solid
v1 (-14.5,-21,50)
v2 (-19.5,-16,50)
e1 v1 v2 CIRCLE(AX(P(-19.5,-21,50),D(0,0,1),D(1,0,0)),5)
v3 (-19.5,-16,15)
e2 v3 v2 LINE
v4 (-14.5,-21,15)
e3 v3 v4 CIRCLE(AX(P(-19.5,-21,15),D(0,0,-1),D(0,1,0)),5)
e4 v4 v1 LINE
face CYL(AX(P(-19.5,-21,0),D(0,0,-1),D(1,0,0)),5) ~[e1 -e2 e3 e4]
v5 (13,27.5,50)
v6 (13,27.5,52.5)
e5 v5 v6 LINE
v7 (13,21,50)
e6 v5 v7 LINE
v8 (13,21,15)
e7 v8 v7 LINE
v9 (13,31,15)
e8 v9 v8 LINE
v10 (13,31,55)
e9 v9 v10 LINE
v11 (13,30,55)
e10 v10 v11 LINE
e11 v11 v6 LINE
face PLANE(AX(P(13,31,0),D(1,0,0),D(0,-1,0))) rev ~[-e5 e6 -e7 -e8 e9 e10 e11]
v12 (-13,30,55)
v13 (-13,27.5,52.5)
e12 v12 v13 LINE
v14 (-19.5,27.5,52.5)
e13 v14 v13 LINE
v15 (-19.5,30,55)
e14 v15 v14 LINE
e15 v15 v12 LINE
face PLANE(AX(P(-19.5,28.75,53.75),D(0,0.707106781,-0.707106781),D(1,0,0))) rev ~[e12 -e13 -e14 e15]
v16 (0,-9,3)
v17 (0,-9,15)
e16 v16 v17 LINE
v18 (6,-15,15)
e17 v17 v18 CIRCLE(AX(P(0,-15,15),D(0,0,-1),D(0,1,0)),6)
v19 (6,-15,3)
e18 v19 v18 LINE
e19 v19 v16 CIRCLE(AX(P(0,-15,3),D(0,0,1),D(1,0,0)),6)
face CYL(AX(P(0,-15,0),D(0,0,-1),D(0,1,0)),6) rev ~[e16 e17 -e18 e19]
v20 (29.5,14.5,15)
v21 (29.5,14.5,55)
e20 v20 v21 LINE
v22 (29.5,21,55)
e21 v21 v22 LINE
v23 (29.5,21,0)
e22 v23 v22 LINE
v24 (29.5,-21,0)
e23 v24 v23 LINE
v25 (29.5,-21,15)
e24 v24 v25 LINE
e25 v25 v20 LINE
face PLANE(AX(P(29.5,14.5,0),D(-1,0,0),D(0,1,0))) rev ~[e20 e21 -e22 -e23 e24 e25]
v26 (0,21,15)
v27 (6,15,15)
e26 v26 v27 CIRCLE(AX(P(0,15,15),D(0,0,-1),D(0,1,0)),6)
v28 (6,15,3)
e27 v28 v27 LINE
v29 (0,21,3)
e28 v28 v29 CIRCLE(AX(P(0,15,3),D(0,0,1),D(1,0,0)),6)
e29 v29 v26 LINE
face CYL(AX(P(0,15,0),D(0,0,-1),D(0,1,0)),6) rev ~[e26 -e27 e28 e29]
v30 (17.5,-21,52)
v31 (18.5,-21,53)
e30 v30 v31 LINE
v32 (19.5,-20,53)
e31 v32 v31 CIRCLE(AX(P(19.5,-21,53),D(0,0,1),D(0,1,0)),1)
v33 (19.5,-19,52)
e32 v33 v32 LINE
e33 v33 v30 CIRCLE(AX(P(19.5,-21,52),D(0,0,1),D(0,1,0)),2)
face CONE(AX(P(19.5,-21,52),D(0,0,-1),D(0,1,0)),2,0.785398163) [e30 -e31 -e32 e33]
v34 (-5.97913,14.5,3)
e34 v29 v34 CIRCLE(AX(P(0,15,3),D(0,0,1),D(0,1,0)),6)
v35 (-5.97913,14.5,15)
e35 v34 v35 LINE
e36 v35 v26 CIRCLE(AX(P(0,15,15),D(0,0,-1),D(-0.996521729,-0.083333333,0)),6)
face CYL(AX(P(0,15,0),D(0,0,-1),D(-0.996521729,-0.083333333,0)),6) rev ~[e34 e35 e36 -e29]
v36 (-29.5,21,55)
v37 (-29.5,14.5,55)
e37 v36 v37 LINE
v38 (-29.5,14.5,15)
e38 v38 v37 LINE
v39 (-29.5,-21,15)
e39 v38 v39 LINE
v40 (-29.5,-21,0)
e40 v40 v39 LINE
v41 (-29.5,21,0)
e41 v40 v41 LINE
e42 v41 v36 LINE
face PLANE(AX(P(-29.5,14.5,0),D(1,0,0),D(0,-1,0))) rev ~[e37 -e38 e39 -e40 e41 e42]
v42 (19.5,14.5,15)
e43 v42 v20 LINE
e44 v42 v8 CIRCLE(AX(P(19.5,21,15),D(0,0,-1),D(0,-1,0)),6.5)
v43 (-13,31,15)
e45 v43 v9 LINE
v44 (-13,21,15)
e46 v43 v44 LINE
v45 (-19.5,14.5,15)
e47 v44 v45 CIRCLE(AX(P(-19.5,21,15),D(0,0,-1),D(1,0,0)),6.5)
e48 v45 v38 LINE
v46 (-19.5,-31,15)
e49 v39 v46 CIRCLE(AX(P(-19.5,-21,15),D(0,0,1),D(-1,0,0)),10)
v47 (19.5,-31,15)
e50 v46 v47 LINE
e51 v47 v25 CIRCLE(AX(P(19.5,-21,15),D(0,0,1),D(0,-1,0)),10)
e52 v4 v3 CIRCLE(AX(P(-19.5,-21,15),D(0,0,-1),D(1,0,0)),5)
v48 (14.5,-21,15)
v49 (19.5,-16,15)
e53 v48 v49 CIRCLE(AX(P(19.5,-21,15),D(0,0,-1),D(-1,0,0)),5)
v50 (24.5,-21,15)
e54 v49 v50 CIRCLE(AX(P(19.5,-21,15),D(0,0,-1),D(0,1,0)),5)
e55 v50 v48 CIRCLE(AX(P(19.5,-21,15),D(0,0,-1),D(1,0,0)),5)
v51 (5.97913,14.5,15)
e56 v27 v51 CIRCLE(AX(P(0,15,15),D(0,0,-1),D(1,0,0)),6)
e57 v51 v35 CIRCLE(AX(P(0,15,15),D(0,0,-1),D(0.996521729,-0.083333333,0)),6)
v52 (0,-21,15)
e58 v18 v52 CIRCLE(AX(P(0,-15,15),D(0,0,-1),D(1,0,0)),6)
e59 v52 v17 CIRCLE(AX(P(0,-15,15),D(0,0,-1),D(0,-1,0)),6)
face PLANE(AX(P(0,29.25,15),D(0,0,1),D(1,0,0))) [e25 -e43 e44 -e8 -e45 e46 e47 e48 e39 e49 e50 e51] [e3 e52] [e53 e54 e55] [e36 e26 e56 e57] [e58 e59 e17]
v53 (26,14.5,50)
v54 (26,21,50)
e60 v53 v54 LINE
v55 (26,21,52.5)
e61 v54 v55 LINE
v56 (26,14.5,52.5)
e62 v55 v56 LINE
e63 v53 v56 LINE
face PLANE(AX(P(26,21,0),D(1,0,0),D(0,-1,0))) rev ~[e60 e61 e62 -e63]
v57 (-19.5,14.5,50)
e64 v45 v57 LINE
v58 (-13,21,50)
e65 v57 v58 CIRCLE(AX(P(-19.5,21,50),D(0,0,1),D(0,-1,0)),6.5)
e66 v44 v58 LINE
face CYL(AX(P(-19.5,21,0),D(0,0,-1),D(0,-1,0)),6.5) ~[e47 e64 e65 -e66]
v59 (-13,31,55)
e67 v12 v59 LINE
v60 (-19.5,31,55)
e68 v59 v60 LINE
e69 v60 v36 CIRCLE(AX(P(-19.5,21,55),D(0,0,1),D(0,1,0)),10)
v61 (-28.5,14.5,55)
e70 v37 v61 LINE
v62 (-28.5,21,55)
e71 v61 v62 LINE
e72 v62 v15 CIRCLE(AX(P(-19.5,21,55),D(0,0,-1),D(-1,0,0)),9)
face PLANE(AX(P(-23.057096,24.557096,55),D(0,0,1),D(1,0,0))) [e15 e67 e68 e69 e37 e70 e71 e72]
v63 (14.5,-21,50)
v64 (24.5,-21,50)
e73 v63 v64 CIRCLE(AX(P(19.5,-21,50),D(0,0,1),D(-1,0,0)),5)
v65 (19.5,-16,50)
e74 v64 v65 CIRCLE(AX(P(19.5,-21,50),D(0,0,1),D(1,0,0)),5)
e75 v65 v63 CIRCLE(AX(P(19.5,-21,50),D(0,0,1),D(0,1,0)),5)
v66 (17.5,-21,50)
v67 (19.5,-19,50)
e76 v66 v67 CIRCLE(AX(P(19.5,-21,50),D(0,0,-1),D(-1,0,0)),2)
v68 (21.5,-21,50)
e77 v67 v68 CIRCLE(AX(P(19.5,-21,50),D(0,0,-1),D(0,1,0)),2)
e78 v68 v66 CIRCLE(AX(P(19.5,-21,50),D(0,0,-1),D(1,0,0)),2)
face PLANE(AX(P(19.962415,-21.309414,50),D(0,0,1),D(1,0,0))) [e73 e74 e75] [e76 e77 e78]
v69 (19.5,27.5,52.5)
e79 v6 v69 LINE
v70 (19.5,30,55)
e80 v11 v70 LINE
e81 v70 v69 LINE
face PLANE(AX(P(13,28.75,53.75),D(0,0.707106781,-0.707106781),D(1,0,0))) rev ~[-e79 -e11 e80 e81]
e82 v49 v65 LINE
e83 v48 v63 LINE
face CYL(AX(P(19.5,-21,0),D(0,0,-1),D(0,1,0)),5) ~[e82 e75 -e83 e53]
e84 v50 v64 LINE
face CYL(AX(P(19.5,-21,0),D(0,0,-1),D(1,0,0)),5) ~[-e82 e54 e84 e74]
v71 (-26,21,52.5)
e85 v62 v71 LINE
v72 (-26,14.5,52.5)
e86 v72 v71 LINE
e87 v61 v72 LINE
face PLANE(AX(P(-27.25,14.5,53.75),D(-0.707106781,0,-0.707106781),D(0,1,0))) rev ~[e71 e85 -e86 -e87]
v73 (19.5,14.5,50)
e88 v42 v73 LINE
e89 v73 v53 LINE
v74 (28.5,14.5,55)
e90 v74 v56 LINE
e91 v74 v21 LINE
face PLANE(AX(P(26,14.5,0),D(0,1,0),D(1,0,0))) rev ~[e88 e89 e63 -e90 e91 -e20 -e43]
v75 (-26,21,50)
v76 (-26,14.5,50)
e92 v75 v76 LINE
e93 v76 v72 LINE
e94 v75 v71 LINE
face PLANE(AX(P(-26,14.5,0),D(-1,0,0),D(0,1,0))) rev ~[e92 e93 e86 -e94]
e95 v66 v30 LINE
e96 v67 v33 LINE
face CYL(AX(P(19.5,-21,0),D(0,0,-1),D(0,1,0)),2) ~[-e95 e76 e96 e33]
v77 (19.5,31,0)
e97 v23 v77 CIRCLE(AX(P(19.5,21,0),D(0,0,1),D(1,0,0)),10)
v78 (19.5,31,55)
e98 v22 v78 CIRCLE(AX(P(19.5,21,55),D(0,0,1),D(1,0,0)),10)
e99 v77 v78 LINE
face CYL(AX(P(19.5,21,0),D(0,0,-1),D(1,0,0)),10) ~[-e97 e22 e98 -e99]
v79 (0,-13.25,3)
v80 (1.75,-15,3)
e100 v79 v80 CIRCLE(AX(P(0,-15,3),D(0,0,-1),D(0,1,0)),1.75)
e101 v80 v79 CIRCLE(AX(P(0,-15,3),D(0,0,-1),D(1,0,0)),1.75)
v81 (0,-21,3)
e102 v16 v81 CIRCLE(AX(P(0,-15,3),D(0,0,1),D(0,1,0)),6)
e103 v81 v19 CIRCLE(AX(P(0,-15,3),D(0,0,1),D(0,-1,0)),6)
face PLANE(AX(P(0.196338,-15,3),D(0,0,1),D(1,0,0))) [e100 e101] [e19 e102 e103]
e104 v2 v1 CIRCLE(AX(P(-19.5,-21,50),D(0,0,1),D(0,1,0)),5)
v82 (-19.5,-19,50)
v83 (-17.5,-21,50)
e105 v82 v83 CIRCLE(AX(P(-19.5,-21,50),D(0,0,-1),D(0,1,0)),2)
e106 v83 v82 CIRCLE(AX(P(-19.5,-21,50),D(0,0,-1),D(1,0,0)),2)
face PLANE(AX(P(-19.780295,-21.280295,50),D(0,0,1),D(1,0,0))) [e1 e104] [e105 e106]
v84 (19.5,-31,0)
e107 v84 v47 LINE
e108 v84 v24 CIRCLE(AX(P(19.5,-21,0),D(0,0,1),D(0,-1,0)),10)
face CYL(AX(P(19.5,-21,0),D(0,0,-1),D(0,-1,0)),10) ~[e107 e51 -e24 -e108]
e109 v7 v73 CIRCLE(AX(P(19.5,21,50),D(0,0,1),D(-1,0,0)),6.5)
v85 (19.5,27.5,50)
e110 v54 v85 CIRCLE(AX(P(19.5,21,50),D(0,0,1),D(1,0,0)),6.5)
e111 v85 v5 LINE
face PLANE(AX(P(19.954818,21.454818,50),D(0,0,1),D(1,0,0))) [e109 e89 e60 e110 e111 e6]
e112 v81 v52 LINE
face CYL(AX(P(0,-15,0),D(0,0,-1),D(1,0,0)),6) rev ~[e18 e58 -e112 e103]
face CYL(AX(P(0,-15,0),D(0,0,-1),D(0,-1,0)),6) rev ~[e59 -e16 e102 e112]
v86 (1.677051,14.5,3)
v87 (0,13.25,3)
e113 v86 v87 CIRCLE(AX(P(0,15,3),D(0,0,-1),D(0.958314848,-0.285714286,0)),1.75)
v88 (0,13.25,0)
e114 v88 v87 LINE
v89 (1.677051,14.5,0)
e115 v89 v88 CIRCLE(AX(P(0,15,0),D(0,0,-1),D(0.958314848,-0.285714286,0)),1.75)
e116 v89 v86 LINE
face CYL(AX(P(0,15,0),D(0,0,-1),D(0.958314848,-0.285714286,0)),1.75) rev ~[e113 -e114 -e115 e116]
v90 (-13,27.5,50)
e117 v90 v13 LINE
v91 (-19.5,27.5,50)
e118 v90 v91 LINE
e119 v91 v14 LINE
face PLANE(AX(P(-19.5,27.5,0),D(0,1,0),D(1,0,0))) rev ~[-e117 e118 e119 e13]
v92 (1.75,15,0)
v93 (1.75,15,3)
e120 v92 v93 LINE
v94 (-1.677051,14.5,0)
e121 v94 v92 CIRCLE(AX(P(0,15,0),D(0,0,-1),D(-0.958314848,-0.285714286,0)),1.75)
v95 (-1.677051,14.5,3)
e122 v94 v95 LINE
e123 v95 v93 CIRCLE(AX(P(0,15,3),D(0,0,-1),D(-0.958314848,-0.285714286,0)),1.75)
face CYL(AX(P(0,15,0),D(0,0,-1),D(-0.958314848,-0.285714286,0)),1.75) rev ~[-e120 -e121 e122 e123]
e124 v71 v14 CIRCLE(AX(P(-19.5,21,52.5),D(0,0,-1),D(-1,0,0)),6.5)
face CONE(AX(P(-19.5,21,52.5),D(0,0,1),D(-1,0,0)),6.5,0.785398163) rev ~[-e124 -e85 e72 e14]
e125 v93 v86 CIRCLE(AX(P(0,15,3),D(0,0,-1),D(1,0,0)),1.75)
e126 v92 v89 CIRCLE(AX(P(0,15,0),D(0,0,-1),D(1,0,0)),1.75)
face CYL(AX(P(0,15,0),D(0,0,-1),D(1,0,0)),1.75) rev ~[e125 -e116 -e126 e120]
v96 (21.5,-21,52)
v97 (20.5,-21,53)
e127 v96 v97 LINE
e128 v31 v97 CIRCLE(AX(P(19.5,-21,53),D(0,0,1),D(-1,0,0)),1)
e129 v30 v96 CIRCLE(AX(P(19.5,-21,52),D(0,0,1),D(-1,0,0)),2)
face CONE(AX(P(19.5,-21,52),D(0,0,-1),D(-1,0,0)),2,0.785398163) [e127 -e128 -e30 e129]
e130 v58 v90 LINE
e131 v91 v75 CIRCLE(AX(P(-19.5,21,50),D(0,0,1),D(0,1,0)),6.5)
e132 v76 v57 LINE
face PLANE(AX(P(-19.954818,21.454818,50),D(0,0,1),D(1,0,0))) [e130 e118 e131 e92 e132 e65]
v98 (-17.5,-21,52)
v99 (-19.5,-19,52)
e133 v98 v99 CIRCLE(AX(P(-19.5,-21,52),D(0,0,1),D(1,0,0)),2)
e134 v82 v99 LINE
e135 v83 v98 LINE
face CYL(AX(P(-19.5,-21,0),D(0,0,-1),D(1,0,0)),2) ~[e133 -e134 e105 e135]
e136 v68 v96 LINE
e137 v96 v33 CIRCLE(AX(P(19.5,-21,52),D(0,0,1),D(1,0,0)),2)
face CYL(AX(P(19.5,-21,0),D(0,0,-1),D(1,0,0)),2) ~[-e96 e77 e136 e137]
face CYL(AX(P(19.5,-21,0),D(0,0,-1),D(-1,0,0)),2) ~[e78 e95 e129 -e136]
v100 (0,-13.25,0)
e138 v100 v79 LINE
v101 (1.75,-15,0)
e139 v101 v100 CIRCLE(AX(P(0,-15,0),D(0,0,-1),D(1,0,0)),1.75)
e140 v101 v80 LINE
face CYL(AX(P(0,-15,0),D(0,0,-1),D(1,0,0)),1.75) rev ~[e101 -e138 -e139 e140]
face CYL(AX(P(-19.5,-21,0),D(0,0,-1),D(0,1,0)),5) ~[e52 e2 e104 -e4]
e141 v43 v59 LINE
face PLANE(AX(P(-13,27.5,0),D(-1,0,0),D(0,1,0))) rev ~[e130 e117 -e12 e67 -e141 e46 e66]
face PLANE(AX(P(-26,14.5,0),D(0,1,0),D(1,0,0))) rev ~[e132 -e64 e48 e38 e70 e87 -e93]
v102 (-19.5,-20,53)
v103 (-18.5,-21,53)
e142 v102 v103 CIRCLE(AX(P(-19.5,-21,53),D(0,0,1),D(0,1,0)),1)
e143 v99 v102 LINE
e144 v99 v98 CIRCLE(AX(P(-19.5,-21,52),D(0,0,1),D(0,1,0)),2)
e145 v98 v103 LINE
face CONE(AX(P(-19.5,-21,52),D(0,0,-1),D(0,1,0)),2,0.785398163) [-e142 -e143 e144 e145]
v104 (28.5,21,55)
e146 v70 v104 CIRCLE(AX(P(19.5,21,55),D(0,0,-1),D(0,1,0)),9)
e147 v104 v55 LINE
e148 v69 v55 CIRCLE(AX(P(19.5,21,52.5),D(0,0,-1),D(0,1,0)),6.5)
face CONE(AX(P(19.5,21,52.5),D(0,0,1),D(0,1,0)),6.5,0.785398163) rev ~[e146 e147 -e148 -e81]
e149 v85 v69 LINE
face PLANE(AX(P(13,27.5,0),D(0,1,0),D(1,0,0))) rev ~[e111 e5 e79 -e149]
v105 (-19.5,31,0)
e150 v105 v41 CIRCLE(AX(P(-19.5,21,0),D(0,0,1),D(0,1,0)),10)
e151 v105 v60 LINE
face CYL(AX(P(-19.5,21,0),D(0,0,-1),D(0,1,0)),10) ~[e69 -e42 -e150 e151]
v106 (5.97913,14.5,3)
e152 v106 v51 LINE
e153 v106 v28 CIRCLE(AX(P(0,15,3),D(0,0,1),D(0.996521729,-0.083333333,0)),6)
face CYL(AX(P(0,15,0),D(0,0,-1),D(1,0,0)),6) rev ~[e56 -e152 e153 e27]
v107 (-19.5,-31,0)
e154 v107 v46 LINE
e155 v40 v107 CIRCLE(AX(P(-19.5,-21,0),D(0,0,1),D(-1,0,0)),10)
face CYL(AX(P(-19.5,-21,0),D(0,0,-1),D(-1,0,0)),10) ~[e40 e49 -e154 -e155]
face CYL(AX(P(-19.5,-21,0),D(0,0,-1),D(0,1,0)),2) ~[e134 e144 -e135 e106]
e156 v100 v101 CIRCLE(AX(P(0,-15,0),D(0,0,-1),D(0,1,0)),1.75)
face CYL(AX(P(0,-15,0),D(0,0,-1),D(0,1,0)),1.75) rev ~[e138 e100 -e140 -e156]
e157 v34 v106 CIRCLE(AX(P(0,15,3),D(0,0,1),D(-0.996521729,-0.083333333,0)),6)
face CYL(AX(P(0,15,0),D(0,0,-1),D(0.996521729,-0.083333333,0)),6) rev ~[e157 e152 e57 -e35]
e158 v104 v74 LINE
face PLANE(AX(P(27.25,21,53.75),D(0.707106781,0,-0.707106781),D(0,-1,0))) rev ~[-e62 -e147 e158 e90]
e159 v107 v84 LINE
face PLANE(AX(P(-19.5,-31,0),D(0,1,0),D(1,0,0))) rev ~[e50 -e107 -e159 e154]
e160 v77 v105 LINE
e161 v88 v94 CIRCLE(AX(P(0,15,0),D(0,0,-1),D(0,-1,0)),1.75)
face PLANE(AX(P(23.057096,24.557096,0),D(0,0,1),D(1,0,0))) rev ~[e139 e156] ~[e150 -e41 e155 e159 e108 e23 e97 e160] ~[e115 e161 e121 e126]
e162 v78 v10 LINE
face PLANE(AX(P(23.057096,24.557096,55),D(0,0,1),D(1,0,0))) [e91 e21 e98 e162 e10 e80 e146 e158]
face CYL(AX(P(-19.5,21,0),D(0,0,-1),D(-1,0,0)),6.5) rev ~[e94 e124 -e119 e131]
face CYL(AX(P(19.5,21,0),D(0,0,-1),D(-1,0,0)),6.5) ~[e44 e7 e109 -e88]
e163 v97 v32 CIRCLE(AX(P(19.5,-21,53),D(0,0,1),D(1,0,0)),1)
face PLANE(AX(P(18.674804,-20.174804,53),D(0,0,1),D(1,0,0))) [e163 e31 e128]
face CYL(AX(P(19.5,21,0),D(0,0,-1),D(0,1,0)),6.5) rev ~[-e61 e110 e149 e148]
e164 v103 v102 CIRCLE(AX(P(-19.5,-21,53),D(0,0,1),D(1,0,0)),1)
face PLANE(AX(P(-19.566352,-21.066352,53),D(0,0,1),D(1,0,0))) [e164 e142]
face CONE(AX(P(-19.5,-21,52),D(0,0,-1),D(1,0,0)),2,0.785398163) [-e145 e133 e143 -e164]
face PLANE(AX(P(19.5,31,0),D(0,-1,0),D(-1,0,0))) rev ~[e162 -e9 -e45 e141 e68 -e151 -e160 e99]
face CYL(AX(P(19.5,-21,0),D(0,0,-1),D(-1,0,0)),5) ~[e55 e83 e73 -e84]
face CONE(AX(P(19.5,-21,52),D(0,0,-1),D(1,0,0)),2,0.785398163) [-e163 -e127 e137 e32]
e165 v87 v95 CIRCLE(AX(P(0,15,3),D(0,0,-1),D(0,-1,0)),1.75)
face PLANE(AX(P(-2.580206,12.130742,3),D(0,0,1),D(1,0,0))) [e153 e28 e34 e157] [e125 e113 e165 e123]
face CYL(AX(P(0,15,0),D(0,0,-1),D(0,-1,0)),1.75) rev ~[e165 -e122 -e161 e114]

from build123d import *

# Parameters (mm, degrees)
F0_W     = 26
F0_H     = 3.5
F1_DEPTH = 15
F2_DEPTH = 50
F3_DEPTH = 53
F4_DEPTH = 3
F5_DEPTH = 55
F6_SIZE  = 2.5
F7_SIZE  = 1


# Not quite as in the source:
# - a feature names something its author has since deleted; it is built from what else it names


with BuildPart() as f1:
    # F0 (on Top) → F1 (new body)
    with BuildSketch(Plane.XY):
        with Locations((0, 29.25)):
            Rectangle(F0_W, F0_H)
        with BuildLine():
            Line((29.5, -21), (29.5, 14.5))
            Line((29.5, 14.5), (26, 14.5))
            Line((26, 14.5), (19.5, 14.5))
            Line((19.5, 14.5), (19.5, 0))
            Line((19.5, 0), (19.5, -16))
            ThreePointArc((19.5, -16), (23.0355339059, -17.4644660941), (24.5, -21))
            ThreePointArc((24.5, -21), (19.5, -26), (14.5, -21))
            Line((14.5, -21), (0, -21))
            Line((0, -21), (-14.5, -21))
            ThreePointArc((-14.5, -21), (-23.0355339059, -24.5355339059), (-19.5, -16))
            Line((-19.5, -16), (-19.5, 14.5))
            Line((-19.5, 14.5), (-26, 14.5))
            Line((-26, 14.5), (-29.5, 14.5))
            Line((-29.5, 14.5), (-29.5, -21))
            ThreePointArc((-29.5, -21), (-26.5710678119, -28.0710678119), (-19.5, -31))
            Line((-19.5, -31), (19.5, -31))
            ThreePointArc((19.5, -31), (26.5710678119, -28.0710678119), (29.5, -21))
        make_face()
        with BuildLine():
            Line((19.5, 0), (19.5, 14.5))
            Line((19.5, 14.5), (5.9791303716, 14.5))
            ThreePointArc((5.9791303716, 14.5), (4.0620192023, 10.5841195668), (0, 9))
            Line((0, 9), (0, 0))
            Line((0, 0), (19.5, 0))
        make_face()
        with BuildLine():
            Line((-5.9791303716, 14.5), (-19.5, 14.5))
            Line((-19.5, 14.5), (-19.5, -16))
            ThreePointArc((-19.5, -16), (-15.9644660941, -17.4644660941), (-14.5, -21))
            Line((-14.5, -21), (0, -21))
            ThreePointArc((0, -21), (-6, -15), (0, -9))
            Line((0, -9), (0, 0))
            Line((0, 0), (0, 9))
            ThreePointArc((0, 9), (-4.0620192023, 10.5841195668), (-5.9791303716, 14.5))
        make_face()
        with BuildLine():
            Line((19.5, -16), (19.5, 0))
            Line((19.5, 0), (0, 0))
            Line((0, 0), (0, -9))
            ThreePointArc((0, -9), (4.2426406871, -10.7573593129), (6, -15))
            ThreePointArc((6, -15), (4.2426406871, -19.2426406871), (0, -21))
            Line((0, -21), (14.5, -21))
            ThreePointArc((14.5, -21), (15.9644660941, -17.4644660941), (19.5, -16))
        make_face()
        Polygon((13, 21), (13, 27.5), (-13, 27.5), (-13, 21), (0, 21), align=None)
        with BuildLine():
            Line((0, 21), (-13, 21))
            ThreePointArc((-13, 21), (-14.9038059223, 16.4038059223), (-19.5, 14.5))
            Line((-19.5, 14.5), (-5.9791303716, 14.5))
            ThreePointArc((-5.9791303716, 14.5), (-4.4158804332, 19.0620192023), (0, 21))
        make_face()
        with BuildLine():
            ThreePointArc((19.5, 14.5), (14.9038059223, 16.4038059223), (13, 21))
            Line((13, 21), (0, 21))
            ThreePointArc((0, 21), (4.2426406871, 19.2426406871), (6, 15))
            ThreePointArc((6, 15), (5.9947803225, 14.7497823241), (5.9791303716, 14.5))
            Line((5.9791303716, 14.5), (19.5, 14.5))
        make_face()
    extrude(amount=F1_DEPTH)

    # F0 (on Top) → F2 (join)
    with BuildSketch(Plane.XY):
        with BuildLine():
            ThreePointArc((-13, 21), (-14.9038059223, 25.5961940777), (-19.5, 27.5))
            ThreePointArc((-19.5, 27.5), (-24.0961940777, 25.5961940777), (-26, 21))
            ThreePointArc((-26, 21), (-24.0961940777, 16.4038059223), (-19.5, 14.5))
            Line((-19.5, 14.5), (-19.5, 21))
            Line((-19.5, 21), (-13, 21))
        make_face()
        with BuildLine():
            ThreePointArc((-19.5, 14.5), (-14.9038059223, 16.4038059223), (-13, 21))
            Line((-13, 21), (-19.5, 21))
            Line((-19.5, 21), (-19.5, 14.5))
        make_face()
        with BuildLine():
            Line((-13, 21), (-13, 27.5))
            Line((-13, 27.5), (-19.5, 27.5))
            ThreePointArc((-19.5, 27.5), (-14.9038059223, 25.5961940777), (-13, 21))
        make_face()
        with BuildLine():
            ThreePointArc((26, 21), (24.0961940777, 25.5961940777), (19.5, 27.5))
            ThreePointArc((19.5, 27.5), (14.9038059223, 25.5961940777), (13, 21))
            Line((13, 21), (19.5, 21))
            Line((19.5, 21), (19.5, 14.5))
            ThreePointArc((19.5, 14.5), (24.0961940777, 16.4038059223), (26, 21))
        make_face()
        with BuildLine():
            Line((19.5, 21), (13, 21))
            ThreePointArc((13, 21), (14.9038059223, 16.4038059223), (19.5, 14.5))
            Line((19.5, 14.5), (19.5, 21))
        make_face()
        with BuildLine():
            ThreePointArc((24.5, -21), (23.0355339059, -17.4644660941), (19.5, -16))
            Line((19.5, -16), (19.5, -19))
            ThreePointArc((19.5, -19), (20.9142135624, -19.5857864376), (21.5, -21))
            ThreePointArc((21.5, -21), (19.5, -23), (17.5, -21))
            Line((17.5, -21), (14.5, -21))
            ThreePointArc((14.5, -21), (19.5, -26), (24.5, -21))
        make_face()
        with BuildLine():
            Line((19.5, -19), (19.5, -16))
            ThreePointArc((19.5, -16), (15.9644660941, -17.4644660941), (14.5, -21))
            Line((14.5, -21), (17.5, -21))
            ThreePointArc((17.5, -21), (18.0857864376, -19.5857864376), (19.5, -19))
        make_face()
        with BuildLine():
            Line((-19.5, -19), (-19.5, -16))
            ThreePointArc((-19.5, -16), (-23.0355339059, -24.5355339059), (-14.5, -21))
            Line((-14.5, -21), (-17.5, -21))
            ThreePointArc((-17.5, -21), (-20.9142135624, -22.4142135624), (-19.5, -19))
        make_face()
        with BuildLine():
            ThreePointArc((-14.5, -21), (-15.9644660941, -17.4644660941), (-19.5, -16))
            Line((-19.5, -16), (-19.5, -19))
            ThreePointArc((-19.5, -19), (-18.0857864376, -19.5857864376), (-17.5, -21))
            Line((-17.5, -21), (-14.5, -21))
        make_face()
        with BuildLine():
            Line((19.5, 27.5), (13, 27.5))
            Line((13, 27.5), (13, 21))
            ThreePointArc((13, 21), (14.9038059223, 25.5961940777), (19.5, 27.5))
        make_face()
        with BuildLine():
            Line((19.5, 14.5), (26, 14.5))
            Line((26, 14.5), (26, 21))
            ThreePointArc((26, 21), (24.0961940777, 16.4038059223), (19.5, 14.5))
        make_face()
        with BuildLine():
            ThreePointArc((-19.5, 14.5), (-24.0961940777, 16.4038059223), (-26, 21))
            Line((-26, 21), (-26, 14.5))
            Line((-26, 14.5), (-19.5, 14.5))
        make_face()
    extrude(amount=F2_DEPTH)

    # F0 (on Top) → F3 (join)
    with BuildSketch(Plane.XY):
        with BuildLine():
            Line((-19.5, -21), (-19.5, -19))
            ThreePointArc((-19.5, -19), (-20.9142135624, -22.4142135624), (-17.5, -21))
            Line((-17.5, -21), (-19.5, -21))
        make_face()
        with BuildLine():
            ThreePointArc((-17.5, -21), (-18.0857864376, -19.5857864376), (-19.5, -19))
            Line((-19.5, -19), (-19.5, -21))
            Line((-19.5, -21), (-17.5, -21))
        make_face()
        with BuildLine():
            Line((19.5, -21), (19.5, -19))
            ThreePointArc((19.5, -19), (18.0857864376, -19.5857864376), (17.5, -21))
            Line((17.5, -21), (19.5, -21))
        make_face()
        with BuildLine():
            ThreePointArc((21.5, -21), (20.9142135624, -19.5857864376), (19.5, -19))
            Line((19.5, -19), (19.5, -21))
            Line((19.5, -21), (17.5, -21))
            ThreePointArc((17.5, -21), (19.5, -23), (21.5, -21))
        make_face()
    extrude(amount=F3_DEPTH)

    # F0 (on Top) → F4 (join)
    with BuildSketch(Plane.XY):
        with BuildLine():
            Line((-1.6770509831, 14.5), (-5.9791303716, 14.5))
            ThreePointArc((-5.9791303716, 14.5), (-4.0620192023, 10.5841195668), (0, 9))
            Line((0, 9), (0, 13.25))
            ThreePointArc((0, 13.25), (-1.0458250332, 13.59687848), (-1.6770509831, 14.5))
        make_face()
        with BuildLine():
            ThreePointArc((0, 9), (4.0620192023, 10.5841195668), (5.9791303716, 14.5))
            Line((5.9791303716, 14.5), (1.6770509831, 14.5))
            ThreePointArc((1.6770509831, 14.5), (1.0458250332, 13.59687848), (0, 13.25))
            Line((0, 13.25), (0, 9))
        make_face()
        with BuildLine():
            ThreePointArc((6, 15), (4.2426406871, 19.2426406871), (0, 21))
            ThreePointArc((0, 21), (-4.4158804332, 19.0620192023), (-5.9791303716, 14.5))
            Line((-5.9791303716, 14.5), (-1.6770509831, 14.5))
            ThreePointArc((-1.6770509831, 14.5), (-0.2526467688, 16.7316667145), (1.75, 15))
            ThreePointArc((1.75, 15), (1.7316667145, 14.7473532312), (1.6770509831, 14.5))
            Line((1.6770509831, 14.5), (5.9791303716, 14.5))
            ThreePointArc((5.9791303716, 14.5), (5.9947803225, 14.7497823241), (6, 15))
        make_face()
        with BuildLine():
            ThreePointArc((6, -15), (4.2426406871, -10.7573593129), (0, -9))
            ThreePointArc((0, -9), (-6, -15), (0, -21))
            ThreePointArc((0, -21), (4.2426406871, -19.2426406871), (6, -15))
        make_face()
        with BuildLine():
            ThreePointArc((1.75, -15), (-1.2374368671, -16.2374368671), (0, -13.25))
            ThreePointArc((0, -13.25), (1.2374368671, -13.7625631329), (1.75, -15))
        make_face(mode=Mode.SUBTRACT)
    extrude(amount=F4_DEPTH)

    # F0 (on Top) → F5 (join)
    with BuildSketch(Plane.XY):
        with BuildLine():
            ThreePointArc((29.5, 21), (26.5710678119, 28.0710678119), (19.5, 31))
            Line((19.5, 31), (13, 31))
            Line((13, 31), (13, 27.5))
            Line((13, 27.5), (19.5, 27.5))
            ThreePointArc((19.5, 27.5), (24.0961940777, 25.5961940777), (26, 21))
            Line((26, 21), (26, 14.5))
            Line((26, 14.5), (29.5, 14.5))
            Line((29.5, 14.5), (29.5, 21))
        make_face()
        with BuildLine():
            Line((-13, 27.5), (-13, 31))
            Line((-13, 31), (-19.5, 31))
            ThreePointArc((-19.5, 31), (-26.5710678119, 28.0710678119), (-29.5, 21))
            Line((-29.5, 21), (-29.5, 14.5))
            Line((-29.5, 14.5), (-26, 14.5))
            Line((-26, 14.5), (-26, 21))
            ThreePointArc((-26, 21), (-24.0961940777, 25.5961940777), (-19.5, 27.5))
            Line((-19.5, 27.5), (-13, 27.5))
        make_face()
    extrude(amount=F5_DEPTH)

    # F6
    f6_edges = [f1.edges().sort_by_distance(p)[0] for p in [
        (24.096194, 25.596194, 55),
        (16.25, 27.5, 55),
        (-16.25, 27.5, 55),
        (-24.096194, 25.596194, 55),
    ]]
    chamfer(f6_edges, length=F6_SIZE)

    # F7
    f7_edges = [f1.edges().sort_by_distance(p)[0] for p in [
        (-21.5, -21, 53),
        (21.5, -21, 53),
    ]]
    chamfer(f7_edges, length=F7_SIZE)


solid = f1.part
